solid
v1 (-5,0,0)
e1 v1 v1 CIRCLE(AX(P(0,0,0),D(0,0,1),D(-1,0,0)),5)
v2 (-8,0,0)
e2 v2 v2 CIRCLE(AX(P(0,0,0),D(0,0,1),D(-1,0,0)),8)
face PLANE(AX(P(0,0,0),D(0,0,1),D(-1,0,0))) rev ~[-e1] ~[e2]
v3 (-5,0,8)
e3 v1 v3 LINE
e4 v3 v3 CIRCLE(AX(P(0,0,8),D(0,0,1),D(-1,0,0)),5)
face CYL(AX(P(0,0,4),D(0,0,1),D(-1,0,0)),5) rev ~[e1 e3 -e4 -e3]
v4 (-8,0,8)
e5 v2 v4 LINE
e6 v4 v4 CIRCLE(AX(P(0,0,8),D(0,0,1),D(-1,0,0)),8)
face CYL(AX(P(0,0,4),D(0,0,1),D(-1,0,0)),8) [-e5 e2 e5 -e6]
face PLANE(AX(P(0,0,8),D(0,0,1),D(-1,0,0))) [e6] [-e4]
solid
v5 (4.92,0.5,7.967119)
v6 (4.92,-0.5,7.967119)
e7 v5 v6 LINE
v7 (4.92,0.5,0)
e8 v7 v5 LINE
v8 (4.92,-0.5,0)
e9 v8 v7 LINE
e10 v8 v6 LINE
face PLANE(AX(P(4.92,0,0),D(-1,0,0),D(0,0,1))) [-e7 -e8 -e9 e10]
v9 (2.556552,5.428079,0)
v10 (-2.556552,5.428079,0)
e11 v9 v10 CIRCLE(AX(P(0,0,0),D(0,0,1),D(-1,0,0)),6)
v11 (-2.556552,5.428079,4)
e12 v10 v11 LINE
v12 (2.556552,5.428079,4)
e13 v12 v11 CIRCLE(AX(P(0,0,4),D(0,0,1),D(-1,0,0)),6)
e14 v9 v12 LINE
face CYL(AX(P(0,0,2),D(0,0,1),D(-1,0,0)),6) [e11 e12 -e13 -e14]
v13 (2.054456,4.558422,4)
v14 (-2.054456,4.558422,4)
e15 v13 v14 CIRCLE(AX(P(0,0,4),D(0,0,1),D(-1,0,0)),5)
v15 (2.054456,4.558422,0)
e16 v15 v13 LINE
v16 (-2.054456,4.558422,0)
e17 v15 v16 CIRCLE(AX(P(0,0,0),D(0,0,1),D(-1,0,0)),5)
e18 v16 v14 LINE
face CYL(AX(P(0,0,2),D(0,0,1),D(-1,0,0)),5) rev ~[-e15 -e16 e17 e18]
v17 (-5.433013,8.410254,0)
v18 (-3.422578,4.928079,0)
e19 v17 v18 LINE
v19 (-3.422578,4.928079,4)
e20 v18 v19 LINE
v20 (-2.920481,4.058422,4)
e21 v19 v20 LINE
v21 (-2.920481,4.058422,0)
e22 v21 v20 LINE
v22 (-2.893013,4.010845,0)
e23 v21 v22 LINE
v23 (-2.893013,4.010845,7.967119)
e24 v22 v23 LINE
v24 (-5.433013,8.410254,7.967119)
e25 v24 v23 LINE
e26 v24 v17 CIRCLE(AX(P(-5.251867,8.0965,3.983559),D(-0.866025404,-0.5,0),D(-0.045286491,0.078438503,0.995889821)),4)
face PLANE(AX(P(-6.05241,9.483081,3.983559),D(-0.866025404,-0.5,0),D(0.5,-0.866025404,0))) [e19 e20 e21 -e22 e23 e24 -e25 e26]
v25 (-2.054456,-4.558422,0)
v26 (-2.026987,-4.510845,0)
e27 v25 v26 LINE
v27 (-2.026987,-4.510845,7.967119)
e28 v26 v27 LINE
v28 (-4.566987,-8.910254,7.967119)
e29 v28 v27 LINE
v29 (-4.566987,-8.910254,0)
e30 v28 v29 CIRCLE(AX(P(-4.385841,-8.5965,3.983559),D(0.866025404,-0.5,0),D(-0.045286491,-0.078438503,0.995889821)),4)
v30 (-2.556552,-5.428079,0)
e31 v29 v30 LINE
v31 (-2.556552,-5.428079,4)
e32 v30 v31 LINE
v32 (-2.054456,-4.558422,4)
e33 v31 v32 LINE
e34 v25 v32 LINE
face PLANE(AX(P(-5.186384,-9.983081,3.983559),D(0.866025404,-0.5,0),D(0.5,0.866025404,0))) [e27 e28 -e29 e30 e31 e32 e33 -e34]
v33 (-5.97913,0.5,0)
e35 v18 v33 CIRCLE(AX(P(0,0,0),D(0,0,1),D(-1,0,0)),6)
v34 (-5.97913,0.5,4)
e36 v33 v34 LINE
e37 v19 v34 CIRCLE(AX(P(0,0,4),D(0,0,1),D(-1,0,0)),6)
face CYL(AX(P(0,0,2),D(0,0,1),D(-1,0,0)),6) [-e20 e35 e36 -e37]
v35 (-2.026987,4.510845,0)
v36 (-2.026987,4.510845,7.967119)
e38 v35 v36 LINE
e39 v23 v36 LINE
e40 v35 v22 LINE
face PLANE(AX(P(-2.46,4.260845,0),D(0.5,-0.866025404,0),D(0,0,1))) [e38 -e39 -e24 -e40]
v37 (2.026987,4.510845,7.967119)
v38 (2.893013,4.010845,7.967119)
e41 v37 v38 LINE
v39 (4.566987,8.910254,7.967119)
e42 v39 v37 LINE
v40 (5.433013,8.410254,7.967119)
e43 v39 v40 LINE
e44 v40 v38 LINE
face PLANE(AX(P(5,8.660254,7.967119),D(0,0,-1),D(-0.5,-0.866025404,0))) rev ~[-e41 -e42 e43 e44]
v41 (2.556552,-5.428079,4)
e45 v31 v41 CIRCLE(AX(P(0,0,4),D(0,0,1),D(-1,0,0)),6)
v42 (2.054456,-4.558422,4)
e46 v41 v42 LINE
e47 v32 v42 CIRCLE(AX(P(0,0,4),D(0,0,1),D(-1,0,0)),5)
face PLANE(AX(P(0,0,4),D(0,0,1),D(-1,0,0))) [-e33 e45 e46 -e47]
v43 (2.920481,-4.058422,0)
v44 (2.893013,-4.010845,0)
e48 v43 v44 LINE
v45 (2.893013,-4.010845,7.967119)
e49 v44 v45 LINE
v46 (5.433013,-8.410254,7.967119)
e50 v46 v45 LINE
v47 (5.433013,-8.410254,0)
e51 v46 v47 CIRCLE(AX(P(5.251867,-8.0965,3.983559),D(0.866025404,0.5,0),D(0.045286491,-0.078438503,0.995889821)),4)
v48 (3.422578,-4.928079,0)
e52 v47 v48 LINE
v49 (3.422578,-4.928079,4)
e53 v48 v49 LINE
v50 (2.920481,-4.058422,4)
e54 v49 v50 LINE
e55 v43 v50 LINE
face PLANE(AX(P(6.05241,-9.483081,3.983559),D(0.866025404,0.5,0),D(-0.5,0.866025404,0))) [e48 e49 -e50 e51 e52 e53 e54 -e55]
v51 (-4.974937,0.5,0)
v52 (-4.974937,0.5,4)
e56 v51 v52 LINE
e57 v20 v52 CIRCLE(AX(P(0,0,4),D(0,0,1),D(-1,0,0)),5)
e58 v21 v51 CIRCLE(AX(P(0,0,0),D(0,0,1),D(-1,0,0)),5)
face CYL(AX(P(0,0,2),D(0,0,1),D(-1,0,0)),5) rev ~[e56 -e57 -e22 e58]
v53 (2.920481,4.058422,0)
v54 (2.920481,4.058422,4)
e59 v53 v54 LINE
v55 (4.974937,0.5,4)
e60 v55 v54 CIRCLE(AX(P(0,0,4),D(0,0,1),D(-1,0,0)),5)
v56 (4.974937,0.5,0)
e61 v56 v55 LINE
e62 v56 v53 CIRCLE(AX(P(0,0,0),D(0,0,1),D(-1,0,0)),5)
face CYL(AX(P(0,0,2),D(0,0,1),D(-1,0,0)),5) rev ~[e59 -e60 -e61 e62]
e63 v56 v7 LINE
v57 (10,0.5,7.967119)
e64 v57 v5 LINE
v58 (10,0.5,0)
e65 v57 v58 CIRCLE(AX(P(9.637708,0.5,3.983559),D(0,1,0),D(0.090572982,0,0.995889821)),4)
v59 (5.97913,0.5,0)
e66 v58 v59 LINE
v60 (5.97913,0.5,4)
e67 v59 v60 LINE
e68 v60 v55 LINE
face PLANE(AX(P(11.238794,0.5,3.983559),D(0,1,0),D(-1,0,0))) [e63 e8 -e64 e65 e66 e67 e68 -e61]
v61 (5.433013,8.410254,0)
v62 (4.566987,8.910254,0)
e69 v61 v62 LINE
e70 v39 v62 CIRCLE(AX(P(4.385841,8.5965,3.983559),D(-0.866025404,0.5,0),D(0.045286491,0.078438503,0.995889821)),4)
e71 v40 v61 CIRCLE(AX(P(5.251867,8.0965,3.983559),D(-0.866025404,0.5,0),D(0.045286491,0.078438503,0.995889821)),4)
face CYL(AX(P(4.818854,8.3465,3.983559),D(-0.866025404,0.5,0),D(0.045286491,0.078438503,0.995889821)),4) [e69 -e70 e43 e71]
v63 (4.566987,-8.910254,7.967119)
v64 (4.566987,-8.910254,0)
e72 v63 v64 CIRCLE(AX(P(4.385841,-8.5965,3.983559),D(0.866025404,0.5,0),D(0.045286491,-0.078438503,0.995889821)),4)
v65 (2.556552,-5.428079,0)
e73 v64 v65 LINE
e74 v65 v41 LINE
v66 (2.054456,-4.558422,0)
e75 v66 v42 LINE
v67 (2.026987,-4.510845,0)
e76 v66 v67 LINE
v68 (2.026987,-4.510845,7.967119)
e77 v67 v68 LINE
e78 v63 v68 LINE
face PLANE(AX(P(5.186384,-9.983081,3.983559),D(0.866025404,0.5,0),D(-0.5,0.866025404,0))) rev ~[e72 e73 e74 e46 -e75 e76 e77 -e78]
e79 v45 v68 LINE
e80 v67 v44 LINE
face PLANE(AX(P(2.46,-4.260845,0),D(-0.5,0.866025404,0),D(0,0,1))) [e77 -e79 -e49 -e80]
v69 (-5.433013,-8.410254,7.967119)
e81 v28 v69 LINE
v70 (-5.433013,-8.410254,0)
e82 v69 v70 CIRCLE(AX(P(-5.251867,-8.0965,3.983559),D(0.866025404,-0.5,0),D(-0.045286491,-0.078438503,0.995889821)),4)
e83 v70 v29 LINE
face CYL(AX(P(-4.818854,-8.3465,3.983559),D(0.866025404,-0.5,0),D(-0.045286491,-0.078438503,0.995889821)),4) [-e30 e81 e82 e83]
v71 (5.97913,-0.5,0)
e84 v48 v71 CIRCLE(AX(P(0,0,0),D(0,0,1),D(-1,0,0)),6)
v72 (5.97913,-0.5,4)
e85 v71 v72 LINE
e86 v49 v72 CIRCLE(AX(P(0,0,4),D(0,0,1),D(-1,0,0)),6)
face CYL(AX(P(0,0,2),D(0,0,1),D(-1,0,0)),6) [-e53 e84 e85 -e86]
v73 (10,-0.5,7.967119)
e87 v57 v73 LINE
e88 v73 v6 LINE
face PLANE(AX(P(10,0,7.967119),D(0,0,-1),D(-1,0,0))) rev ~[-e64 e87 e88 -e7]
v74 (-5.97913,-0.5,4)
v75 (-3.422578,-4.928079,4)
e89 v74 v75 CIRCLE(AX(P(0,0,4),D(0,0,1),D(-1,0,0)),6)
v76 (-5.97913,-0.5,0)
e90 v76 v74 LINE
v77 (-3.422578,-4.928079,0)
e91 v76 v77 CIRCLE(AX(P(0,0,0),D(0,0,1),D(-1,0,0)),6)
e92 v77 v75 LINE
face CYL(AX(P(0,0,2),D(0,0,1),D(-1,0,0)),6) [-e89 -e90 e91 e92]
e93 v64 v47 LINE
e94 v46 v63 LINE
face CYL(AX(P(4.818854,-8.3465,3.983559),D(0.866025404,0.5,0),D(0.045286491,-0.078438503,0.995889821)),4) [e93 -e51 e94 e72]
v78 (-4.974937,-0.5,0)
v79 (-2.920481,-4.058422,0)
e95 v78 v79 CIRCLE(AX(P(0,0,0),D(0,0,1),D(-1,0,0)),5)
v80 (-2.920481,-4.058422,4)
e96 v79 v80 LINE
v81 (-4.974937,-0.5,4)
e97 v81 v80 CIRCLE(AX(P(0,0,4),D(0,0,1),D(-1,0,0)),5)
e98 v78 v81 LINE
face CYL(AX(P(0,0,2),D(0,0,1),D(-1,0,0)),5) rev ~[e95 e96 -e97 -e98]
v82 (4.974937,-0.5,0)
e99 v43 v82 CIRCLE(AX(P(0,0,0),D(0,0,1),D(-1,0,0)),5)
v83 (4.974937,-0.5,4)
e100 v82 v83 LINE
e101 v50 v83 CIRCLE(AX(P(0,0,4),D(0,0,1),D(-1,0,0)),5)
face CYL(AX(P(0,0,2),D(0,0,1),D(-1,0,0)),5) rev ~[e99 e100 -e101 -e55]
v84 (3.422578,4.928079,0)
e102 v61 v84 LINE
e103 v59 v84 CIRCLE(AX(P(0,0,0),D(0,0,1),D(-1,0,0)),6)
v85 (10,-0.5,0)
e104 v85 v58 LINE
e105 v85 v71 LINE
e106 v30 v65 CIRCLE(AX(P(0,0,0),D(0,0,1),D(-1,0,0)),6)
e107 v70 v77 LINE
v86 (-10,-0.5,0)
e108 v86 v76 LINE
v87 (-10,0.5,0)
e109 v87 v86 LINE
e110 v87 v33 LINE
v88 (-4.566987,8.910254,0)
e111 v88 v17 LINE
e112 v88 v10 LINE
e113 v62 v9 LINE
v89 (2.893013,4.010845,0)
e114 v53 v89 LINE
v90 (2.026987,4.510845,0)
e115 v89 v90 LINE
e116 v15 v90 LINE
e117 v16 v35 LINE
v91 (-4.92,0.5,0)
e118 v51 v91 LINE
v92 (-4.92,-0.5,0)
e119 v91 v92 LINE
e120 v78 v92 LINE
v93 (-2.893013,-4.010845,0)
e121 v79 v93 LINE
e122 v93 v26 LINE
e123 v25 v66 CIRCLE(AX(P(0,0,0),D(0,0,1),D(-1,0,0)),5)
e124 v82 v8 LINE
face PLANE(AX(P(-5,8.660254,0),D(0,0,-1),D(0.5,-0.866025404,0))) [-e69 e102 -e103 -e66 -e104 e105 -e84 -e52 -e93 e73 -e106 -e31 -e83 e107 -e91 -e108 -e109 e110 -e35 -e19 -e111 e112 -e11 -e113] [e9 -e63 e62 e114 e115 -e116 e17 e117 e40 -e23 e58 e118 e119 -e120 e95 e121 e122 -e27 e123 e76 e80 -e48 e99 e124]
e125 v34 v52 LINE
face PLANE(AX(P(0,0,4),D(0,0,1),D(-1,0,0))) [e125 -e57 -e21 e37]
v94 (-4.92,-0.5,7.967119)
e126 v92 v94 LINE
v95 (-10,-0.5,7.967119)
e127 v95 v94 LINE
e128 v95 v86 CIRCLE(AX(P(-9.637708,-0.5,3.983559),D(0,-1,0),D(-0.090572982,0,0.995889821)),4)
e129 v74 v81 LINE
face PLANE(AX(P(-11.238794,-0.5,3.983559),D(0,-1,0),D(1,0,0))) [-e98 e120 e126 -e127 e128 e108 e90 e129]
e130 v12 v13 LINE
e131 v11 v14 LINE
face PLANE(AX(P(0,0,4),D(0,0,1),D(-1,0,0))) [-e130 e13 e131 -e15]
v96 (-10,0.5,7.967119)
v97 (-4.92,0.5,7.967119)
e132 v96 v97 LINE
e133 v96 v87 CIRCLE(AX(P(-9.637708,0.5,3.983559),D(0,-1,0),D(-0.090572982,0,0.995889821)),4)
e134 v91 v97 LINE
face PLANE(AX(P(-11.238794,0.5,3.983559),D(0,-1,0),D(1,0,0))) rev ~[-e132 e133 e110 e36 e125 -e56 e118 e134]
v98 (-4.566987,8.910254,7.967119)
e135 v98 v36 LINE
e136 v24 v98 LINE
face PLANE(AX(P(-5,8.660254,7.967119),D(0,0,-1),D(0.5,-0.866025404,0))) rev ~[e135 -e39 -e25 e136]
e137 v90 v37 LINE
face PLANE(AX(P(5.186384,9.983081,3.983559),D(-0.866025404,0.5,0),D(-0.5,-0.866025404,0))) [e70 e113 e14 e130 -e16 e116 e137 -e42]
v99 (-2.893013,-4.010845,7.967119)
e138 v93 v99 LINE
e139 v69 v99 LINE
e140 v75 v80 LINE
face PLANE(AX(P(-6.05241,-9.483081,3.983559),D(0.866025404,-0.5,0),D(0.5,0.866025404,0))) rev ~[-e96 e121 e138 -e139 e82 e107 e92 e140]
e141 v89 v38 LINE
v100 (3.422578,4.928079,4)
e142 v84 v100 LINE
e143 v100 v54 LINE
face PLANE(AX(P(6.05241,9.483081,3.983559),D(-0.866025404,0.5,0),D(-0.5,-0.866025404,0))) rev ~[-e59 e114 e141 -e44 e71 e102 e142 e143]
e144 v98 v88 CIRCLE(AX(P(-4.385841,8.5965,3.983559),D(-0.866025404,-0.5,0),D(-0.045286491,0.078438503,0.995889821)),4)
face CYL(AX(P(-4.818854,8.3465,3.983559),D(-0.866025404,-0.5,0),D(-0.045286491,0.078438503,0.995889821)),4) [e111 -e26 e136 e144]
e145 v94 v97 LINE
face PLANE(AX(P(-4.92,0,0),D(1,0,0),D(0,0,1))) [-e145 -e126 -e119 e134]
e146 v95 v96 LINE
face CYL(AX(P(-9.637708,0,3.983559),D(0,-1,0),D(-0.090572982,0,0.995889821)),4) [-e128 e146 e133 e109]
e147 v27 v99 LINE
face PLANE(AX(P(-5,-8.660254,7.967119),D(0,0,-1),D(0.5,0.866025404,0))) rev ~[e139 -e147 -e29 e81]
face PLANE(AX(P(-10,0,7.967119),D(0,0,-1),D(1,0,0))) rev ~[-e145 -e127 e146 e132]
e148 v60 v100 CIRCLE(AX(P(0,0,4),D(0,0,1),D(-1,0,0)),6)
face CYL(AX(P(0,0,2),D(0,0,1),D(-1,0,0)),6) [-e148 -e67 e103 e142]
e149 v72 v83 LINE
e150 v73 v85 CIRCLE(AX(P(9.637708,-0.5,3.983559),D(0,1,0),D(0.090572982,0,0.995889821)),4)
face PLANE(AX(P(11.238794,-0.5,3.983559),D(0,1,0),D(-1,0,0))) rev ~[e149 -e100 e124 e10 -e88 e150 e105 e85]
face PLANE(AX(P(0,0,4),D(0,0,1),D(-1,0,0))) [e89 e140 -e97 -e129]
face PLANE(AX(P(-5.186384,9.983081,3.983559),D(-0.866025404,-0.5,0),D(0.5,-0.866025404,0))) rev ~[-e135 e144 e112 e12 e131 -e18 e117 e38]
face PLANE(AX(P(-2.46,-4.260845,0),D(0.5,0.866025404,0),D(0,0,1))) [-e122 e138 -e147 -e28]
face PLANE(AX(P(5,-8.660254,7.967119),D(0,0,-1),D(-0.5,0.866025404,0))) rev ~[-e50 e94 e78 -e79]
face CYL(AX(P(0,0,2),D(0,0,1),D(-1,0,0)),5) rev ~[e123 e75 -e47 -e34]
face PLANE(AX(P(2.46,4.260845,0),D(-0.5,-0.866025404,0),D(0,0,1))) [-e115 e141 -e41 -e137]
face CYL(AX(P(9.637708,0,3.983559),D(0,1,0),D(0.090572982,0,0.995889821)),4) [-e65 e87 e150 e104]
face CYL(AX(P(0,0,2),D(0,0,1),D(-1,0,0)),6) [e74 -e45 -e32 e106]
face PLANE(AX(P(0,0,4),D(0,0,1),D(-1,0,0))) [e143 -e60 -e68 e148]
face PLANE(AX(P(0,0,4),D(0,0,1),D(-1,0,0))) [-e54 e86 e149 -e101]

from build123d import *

# Parameters (mm, degrees)
F0_W            = 1
F0_H            = 4
F2_W            = 5.08
F2_H            = 7.9671185657
F3_DEPTH        = 0.5
F3_COPIES_COUNT = 6
F5_W            = 3
F5_H            = 8


# Not quite as in the source:
# - a pattern or mirror of a feature is missing from the dataset's text; its kind, count and spacing are read off the source's solid


with BuildPart() as f1:
    # F0 (on Front) → F1 (revolve)
    with BuildSketch(Plane.XZ):
        with Locations((-5.5, 2)):
            Rectangle(F0_W, F0_H)
    revolve(axis=Axis((0, 0, 19.3039998412), (0, 0, 1)))

    # F2 (on Front) → F3 (join, symmetric)
    with BuildSketch(Plane.XZ):
        with BuildLine():
            Line((-10, 0), (-10, 7.9671185657))
            ThreePointArc((-10, 7.9671185657), (-13.6377080735, 3.9835592829), (-10, 0))
        make_face()
        with Locations((-7.46, 3.9835592829)):
            Rectangle(F2_W, F2_H)
    f3 = extrude(amount=F3_DEPTH, both=True)

    # F3_copies: F3 ×6 about axis
    f3_copies_axis = Axis((0, 0, 0), (0, 0, 1))
    for i in range(1, F3_COPIES_COUNT):
        add(f3.rotate(f3_copies_axis, i * 360 / F3_COPIES_COUNT))


with BuildPart() as f6:
    # F5 (on Front) → F6 (revolve)
    with BuildSketch(Plane.XZ):
        with Locations((-6.5, 4)):
            Rectangle(F5_W, F5_H)
    revolve(axis=Axis((0, 0, 73.8201290369), (0, 0, 1)))


solid = Compound([f1.part, f6.part])
